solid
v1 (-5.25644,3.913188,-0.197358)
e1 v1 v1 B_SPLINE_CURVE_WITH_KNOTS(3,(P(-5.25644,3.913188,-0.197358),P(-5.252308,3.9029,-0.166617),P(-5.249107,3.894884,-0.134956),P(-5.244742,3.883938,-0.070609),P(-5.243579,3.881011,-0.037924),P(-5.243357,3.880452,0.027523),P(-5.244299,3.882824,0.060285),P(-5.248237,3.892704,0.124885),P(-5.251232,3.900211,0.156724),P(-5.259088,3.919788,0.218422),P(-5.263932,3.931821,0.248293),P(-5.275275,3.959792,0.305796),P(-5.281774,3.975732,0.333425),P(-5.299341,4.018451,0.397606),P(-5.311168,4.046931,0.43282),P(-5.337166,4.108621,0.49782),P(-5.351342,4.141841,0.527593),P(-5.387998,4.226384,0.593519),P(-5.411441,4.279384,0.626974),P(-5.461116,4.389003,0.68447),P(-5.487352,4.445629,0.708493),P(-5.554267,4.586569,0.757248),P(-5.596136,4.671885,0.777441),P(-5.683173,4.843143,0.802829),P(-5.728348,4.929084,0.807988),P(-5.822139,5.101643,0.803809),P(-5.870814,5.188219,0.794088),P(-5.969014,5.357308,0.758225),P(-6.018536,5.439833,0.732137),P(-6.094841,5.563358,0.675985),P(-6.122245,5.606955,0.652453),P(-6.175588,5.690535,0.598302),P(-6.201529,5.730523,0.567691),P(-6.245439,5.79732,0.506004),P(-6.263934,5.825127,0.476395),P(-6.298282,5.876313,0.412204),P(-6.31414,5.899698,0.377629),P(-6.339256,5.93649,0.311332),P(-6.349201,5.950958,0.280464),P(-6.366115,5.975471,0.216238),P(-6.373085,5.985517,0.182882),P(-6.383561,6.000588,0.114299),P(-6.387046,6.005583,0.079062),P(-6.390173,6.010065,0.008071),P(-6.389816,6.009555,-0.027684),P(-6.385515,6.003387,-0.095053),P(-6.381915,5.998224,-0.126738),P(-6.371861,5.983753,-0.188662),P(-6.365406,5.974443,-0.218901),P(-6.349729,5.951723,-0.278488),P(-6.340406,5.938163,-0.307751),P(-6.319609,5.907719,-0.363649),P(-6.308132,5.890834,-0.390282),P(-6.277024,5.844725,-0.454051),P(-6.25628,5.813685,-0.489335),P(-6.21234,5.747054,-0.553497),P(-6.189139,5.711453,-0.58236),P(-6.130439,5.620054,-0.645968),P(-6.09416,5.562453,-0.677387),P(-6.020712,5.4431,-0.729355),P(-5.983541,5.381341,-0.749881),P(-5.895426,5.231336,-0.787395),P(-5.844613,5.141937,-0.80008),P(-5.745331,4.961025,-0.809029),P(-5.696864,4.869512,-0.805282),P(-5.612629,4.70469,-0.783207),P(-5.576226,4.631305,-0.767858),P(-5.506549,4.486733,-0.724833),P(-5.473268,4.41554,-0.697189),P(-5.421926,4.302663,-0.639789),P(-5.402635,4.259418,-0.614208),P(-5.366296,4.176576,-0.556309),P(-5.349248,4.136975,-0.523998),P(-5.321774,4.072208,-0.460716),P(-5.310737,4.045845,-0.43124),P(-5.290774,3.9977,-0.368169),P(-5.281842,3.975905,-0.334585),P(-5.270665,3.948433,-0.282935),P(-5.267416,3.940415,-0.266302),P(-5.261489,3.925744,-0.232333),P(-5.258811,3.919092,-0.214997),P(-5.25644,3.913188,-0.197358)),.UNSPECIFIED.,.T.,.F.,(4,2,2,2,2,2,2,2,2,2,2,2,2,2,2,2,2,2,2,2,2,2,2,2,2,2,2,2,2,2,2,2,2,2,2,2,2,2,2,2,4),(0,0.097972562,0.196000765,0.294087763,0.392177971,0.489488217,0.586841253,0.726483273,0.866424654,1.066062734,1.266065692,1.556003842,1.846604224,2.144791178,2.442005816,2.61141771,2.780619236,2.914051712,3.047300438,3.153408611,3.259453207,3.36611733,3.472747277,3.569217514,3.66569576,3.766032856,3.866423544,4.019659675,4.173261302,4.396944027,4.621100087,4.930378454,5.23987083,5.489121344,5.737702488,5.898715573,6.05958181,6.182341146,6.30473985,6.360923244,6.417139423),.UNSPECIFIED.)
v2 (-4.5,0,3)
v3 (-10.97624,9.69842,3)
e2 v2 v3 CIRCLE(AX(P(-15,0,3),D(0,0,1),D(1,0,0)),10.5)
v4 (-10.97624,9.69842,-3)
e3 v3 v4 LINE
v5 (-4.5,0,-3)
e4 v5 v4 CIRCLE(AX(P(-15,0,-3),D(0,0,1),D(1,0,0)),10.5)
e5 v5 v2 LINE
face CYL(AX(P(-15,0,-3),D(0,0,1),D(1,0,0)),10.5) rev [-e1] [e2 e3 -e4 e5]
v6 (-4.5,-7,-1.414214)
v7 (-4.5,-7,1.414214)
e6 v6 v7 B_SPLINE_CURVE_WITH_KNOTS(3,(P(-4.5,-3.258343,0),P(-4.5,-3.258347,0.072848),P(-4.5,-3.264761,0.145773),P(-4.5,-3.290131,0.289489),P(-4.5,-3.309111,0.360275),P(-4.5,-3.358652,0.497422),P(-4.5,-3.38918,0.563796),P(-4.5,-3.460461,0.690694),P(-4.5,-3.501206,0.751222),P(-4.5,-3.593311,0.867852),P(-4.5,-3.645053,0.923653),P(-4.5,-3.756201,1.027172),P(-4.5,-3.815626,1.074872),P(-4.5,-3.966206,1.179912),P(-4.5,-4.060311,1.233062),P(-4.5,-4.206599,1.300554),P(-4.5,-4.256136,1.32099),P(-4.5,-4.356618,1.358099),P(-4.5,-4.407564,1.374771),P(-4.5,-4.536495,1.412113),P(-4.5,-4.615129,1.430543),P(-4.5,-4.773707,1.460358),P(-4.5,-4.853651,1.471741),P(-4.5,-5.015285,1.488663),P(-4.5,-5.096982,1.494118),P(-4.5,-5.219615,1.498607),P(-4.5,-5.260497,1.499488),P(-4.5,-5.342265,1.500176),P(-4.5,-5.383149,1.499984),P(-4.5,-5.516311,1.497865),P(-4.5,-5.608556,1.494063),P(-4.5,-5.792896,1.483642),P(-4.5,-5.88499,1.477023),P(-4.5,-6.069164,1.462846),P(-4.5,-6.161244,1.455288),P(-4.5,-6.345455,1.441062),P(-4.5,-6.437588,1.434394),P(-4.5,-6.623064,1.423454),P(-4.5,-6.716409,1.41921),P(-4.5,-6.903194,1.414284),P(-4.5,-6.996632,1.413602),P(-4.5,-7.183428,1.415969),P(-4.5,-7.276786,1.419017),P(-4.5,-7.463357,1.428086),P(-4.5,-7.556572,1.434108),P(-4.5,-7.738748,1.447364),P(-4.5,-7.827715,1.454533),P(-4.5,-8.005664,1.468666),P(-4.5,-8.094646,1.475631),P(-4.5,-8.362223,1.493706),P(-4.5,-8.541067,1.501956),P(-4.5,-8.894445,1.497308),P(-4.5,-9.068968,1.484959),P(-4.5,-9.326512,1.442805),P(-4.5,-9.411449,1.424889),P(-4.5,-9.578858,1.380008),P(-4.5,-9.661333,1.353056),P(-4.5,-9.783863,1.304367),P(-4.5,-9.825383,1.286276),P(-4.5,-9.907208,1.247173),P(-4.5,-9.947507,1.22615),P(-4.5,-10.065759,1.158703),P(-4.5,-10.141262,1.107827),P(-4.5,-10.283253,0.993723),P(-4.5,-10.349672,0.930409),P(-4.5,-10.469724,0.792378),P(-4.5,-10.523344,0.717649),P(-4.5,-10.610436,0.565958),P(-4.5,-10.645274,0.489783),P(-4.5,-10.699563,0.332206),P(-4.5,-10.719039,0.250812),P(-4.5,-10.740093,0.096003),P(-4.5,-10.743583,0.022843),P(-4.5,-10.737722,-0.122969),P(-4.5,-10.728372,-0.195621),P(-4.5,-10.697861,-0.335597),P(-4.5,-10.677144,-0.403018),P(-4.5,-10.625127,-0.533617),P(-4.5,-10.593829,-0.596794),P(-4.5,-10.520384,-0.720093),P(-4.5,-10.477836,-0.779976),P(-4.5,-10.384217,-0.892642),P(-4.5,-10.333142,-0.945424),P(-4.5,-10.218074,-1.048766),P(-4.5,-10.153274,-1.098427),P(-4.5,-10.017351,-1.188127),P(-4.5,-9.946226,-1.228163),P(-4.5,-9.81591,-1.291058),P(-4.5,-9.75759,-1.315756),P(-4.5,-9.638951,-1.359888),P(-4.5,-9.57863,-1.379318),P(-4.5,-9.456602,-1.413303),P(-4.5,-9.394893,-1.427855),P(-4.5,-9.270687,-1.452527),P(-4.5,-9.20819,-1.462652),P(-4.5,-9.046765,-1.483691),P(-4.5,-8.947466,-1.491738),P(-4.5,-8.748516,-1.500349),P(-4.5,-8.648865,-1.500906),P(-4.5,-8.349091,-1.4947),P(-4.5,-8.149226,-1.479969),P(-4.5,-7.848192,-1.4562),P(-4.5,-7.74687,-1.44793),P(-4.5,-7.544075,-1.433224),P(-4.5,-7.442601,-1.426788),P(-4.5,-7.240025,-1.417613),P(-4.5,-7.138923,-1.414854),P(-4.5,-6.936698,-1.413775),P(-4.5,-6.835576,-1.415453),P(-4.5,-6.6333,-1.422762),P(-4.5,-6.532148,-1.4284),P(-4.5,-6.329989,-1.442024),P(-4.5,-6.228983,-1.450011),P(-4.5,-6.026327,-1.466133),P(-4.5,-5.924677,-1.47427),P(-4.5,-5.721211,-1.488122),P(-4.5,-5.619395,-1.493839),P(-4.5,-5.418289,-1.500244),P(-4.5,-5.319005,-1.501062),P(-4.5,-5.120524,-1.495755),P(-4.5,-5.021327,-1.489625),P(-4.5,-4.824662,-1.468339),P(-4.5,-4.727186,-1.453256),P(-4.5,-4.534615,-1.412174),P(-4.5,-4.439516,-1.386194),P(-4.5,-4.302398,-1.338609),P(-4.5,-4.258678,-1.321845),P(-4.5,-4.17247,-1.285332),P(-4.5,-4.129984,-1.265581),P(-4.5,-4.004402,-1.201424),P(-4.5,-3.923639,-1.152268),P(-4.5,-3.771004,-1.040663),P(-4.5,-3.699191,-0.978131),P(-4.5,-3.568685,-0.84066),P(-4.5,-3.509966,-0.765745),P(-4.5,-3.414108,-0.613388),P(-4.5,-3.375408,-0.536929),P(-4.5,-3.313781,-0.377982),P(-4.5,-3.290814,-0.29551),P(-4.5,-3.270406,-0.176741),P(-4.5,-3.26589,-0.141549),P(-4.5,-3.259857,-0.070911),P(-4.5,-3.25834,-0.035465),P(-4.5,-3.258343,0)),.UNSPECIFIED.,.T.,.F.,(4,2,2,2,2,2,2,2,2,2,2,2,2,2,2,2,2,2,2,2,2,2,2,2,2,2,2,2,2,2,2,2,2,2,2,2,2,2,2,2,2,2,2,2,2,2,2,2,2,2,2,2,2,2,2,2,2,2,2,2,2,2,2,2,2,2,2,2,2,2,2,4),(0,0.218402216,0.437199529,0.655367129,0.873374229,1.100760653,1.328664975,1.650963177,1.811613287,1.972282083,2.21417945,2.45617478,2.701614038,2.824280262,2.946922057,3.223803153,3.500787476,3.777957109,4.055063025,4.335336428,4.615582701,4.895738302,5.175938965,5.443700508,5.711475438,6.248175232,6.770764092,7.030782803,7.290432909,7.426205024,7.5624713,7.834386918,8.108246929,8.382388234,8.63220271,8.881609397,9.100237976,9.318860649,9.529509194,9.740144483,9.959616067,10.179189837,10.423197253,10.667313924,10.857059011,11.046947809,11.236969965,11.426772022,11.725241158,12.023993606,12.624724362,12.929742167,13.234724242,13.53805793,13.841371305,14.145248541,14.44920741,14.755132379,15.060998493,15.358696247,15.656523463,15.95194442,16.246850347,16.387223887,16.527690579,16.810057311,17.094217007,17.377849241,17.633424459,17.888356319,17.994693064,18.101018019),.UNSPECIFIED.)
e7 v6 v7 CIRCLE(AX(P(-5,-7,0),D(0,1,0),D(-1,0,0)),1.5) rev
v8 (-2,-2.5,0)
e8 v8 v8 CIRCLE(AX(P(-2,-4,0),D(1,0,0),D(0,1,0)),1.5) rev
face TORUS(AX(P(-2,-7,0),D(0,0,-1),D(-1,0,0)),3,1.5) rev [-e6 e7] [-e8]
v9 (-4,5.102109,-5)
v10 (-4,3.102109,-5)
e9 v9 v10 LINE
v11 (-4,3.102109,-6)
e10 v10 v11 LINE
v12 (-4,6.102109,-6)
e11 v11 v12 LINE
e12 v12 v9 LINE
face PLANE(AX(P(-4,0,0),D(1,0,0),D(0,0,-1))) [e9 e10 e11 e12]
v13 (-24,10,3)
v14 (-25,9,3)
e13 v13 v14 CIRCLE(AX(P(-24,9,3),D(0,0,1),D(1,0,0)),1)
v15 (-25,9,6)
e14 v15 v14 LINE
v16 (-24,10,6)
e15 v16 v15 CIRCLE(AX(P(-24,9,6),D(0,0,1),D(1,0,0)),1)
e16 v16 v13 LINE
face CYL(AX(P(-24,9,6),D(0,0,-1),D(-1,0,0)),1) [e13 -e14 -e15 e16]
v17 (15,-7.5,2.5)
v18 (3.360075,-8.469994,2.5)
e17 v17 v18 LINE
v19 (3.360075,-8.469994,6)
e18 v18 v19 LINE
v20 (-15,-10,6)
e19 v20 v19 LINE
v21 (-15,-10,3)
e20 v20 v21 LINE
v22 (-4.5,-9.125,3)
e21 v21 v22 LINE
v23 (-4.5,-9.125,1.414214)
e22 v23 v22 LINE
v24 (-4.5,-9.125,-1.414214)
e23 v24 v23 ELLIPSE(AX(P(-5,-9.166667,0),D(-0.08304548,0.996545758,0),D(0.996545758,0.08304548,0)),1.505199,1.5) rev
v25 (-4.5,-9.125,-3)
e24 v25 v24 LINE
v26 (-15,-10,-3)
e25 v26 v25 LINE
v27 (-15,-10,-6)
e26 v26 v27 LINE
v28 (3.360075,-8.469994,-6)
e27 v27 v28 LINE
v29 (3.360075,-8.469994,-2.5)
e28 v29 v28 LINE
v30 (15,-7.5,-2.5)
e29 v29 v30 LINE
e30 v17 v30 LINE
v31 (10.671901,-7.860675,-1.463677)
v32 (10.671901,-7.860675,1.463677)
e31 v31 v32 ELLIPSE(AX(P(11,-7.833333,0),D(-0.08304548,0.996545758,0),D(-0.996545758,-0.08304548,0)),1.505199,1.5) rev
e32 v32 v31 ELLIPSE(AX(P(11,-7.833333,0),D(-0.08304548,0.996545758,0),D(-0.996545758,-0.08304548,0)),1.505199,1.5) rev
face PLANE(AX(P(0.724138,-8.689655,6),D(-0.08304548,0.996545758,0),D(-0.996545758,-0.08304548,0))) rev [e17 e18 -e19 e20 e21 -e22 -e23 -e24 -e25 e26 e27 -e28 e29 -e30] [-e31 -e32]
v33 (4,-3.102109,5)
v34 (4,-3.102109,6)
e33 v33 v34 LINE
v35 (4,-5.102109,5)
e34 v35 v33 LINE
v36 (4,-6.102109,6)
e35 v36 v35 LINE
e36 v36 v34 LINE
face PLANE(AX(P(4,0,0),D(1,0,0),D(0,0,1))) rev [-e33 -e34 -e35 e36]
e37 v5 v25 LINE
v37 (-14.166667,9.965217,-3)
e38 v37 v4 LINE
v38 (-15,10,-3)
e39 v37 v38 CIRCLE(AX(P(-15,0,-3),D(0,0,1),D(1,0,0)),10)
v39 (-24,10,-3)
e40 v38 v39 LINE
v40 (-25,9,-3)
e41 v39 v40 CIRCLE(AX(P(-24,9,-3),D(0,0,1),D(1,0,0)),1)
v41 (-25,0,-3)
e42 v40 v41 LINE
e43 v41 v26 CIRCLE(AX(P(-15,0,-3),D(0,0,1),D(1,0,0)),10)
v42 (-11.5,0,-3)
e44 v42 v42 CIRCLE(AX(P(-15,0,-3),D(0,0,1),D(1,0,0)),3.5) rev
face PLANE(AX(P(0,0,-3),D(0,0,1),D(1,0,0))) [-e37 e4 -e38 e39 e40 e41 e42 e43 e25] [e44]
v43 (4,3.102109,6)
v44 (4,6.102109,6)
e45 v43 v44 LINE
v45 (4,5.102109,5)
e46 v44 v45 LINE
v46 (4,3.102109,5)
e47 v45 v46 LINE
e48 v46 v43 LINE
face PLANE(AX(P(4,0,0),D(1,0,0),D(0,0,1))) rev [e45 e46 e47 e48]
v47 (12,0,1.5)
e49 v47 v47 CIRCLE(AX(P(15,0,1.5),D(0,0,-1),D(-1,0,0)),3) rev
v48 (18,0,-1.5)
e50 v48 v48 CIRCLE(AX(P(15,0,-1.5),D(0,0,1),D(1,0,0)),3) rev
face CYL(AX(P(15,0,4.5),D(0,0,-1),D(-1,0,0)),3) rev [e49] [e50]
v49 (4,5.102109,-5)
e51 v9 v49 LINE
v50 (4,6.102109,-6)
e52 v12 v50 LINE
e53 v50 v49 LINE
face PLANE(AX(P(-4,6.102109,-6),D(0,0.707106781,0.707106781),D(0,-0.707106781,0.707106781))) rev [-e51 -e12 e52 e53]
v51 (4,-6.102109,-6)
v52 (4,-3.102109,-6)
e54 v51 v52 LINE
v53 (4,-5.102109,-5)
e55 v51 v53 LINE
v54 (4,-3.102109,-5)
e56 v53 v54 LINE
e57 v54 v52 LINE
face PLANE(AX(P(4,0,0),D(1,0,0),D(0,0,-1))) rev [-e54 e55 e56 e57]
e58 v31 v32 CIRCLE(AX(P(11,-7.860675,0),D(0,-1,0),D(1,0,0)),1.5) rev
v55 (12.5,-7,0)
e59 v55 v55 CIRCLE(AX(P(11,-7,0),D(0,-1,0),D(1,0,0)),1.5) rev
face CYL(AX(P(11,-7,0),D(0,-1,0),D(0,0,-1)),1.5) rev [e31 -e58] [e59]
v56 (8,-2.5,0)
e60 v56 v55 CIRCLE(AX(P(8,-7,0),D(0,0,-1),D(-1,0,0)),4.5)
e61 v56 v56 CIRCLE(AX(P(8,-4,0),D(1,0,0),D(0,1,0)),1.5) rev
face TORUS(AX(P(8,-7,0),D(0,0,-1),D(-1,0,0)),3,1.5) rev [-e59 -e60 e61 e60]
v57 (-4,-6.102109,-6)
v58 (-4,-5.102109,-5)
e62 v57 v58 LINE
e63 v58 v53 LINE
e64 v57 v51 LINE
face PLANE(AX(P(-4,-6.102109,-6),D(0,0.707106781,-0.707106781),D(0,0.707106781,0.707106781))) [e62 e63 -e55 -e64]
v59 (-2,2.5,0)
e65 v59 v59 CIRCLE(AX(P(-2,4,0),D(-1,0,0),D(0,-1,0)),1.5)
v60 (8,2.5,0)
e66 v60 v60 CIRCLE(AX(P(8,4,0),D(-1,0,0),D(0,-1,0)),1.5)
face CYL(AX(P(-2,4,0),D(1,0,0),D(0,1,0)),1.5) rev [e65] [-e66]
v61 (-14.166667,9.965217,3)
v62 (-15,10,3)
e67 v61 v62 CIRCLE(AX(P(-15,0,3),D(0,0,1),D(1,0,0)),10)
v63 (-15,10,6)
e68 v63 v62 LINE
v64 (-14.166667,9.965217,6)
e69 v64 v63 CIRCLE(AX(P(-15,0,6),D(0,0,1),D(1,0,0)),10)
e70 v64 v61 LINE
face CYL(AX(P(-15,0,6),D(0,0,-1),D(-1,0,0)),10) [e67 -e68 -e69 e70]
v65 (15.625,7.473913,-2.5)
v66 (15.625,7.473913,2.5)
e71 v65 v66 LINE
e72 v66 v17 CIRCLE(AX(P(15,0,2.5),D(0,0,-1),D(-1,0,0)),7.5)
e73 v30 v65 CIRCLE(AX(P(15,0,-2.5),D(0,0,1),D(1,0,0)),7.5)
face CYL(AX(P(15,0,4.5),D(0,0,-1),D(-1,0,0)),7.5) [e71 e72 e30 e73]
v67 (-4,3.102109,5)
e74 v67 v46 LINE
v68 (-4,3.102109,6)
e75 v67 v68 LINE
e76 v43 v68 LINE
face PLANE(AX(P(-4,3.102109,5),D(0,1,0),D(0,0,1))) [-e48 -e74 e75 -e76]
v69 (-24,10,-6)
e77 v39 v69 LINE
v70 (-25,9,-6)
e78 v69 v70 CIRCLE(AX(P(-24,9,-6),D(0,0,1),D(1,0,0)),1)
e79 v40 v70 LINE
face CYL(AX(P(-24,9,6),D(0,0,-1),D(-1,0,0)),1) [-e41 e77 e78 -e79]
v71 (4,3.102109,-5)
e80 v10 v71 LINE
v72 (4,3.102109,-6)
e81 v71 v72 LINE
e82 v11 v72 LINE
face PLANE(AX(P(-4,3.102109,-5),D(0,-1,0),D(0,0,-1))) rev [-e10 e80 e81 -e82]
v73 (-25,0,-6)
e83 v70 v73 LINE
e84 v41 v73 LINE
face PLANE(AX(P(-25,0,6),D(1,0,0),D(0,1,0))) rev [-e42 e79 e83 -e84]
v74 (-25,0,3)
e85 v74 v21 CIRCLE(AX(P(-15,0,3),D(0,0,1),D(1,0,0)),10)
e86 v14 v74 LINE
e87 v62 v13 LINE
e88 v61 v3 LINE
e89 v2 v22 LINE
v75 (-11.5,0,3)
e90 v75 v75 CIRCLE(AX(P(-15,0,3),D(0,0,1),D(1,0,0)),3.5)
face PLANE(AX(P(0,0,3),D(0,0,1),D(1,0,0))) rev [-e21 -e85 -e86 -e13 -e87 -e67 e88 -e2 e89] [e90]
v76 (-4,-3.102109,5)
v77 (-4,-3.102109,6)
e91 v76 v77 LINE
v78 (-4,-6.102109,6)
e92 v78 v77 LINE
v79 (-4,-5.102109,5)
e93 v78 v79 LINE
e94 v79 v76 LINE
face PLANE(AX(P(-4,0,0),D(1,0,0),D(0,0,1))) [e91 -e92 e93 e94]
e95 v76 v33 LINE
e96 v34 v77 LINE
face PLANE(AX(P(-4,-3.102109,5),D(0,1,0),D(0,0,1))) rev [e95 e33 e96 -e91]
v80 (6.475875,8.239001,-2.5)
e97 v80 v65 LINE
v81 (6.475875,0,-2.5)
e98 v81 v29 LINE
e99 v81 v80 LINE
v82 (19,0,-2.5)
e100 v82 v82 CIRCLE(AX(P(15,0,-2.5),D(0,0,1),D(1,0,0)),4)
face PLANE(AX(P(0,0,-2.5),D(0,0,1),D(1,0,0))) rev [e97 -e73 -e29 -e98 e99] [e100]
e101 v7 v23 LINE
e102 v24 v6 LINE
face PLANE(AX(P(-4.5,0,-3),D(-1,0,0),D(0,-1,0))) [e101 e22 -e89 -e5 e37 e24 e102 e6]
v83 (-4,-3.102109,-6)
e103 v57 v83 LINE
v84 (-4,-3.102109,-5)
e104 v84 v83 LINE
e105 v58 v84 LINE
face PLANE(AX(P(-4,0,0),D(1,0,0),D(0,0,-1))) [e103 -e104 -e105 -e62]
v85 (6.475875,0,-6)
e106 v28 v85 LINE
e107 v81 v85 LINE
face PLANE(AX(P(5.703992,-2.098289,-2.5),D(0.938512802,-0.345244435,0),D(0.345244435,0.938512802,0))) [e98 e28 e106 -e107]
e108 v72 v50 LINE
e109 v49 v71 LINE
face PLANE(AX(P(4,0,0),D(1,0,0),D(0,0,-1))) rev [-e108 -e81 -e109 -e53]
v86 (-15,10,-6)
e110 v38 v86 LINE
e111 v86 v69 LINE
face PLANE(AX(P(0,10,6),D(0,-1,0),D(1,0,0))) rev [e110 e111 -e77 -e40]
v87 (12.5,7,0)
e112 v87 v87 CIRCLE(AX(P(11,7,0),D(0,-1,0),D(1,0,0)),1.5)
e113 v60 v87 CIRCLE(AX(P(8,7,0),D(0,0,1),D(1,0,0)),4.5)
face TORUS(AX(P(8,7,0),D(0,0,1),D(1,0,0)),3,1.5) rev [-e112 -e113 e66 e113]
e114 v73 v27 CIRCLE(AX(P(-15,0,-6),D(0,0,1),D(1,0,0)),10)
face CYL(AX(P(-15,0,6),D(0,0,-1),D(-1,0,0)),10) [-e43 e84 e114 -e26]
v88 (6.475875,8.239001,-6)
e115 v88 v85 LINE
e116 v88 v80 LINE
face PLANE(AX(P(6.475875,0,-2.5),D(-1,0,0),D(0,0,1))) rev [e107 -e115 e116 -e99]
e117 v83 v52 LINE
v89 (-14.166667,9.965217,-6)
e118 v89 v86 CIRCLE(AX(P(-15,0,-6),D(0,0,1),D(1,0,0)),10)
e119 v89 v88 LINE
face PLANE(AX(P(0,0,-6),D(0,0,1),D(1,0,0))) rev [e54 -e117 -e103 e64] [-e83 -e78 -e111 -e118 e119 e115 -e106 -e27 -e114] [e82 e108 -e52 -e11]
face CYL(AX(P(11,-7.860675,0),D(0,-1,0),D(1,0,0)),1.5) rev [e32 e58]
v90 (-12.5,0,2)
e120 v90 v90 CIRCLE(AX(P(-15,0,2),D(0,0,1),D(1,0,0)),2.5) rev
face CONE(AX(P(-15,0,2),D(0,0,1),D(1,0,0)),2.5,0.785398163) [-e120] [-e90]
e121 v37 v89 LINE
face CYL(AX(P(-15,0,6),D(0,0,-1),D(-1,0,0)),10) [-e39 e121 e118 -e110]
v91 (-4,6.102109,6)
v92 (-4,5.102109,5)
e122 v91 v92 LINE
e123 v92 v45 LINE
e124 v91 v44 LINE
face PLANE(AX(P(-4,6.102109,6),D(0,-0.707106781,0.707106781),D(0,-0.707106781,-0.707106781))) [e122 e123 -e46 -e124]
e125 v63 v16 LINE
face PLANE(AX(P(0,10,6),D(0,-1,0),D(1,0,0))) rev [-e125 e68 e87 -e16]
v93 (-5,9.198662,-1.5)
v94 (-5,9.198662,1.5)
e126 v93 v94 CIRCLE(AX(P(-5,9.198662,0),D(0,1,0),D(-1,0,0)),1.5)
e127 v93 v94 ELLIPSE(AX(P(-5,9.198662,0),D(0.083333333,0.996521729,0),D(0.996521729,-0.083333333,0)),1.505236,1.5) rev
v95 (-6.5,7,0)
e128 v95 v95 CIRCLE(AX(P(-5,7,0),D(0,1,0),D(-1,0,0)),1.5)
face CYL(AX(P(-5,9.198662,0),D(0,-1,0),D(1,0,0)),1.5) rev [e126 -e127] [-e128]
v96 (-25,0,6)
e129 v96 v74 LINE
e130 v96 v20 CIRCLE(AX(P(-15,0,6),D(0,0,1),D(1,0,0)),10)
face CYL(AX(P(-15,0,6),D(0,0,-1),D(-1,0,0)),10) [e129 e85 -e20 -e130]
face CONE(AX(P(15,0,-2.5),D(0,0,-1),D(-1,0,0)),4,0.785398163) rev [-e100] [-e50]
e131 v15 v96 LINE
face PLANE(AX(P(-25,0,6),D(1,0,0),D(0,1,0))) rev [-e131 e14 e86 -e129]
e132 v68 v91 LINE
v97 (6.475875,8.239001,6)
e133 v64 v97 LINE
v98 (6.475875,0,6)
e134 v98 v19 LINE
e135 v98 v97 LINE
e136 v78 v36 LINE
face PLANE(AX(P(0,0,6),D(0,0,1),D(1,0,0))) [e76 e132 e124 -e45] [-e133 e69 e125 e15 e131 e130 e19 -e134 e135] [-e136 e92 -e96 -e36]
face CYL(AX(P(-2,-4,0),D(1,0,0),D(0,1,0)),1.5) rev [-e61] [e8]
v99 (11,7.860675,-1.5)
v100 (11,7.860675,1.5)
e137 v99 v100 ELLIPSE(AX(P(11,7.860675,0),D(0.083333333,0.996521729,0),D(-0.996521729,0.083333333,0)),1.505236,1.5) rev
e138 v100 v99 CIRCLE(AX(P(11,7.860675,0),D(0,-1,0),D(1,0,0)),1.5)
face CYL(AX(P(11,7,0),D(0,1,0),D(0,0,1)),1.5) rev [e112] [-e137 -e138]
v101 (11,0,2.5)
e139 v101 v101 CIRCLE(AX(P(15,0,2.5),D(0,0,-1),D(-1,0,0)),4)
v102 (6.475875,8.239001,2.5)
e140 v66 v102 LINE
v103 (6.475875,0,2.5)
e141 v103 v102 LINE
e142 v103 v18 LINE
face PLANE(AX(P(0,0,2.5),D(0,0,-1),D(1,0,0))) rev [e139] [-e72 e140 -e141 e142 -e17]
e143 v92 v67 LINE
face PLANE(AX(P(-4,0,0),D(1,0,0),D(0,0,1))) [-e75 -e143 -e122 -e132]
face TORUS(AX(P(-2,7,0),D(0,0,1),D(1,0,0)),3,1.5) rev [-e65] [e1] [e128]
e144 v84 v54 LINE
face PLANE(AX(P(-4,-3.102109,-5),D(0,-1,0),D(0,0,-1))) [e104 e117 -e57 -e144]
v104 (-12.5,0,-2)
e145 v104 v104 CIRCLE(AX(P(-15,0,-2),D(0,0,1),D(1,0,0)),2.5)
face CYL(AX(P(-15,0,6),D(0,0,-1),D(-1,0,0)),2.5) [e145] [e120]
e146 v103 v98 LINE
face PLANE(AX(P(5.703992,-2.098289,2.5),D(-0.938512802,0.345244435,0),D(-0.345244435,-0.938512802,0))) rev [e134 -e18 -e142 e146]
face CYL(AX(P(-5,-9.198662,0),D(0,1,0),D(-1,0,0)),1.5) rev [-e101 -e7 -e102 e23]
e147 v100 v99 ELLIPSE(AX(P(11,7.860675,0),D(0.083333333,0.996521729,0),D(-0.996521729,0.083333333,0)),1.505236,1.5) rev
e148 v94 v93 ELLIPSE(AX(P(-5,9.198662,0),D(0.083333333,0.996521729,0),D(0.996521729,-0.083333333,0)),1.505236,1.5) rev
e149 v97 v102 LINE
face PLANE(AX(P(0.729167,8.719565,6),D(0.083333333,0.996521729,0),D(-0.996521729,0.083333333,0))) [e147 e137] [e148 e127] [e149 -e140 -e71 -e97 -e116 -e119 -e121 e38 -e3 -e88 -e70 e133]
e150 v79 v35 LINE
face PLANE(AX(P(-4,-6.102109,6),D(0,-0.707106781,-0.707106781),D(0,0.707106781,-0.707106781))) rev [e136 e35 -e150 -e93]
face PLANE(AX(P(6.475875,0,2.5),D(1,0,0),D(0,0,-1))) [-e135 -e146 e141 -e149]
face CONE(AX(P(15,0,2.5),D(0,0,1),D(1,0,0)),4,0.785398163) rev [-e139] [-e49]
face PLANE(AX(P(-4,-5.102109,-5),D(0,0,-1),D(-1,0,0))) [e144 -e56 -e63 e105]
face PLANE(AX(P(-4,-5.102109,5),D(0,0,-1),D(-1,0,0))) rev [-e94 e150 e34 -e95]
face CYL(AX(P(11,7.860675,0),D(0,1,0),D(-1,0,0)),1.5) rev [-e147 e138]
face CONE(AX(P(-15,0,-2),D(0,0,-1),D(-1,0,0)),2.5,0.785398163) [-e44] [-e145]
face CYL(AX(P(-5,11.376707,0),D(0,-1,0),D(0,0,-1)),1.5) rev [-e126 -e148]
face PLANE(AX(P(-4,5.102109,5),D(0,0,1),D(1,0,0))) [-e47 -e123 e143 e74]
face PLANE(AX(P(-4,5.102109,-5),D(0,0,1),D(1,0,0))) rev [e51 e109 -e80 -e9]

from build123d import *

# Parameters (mm, degrees)
BOSS_EXTRUDE1_DEPTH  = 6
SKETCH1_3_R          = 2.5
BOSS_EXTRUDE2_DEPTH  = 6
SKETCH1_5_R          = 3
BOSS_EXTRUDE3_DEPTH  = 4.5
SKETCH1_6_R          = 2.5
CUT_EXTRUDE2_DEPTH   = 3
CUT_EXTRUDE3_DEPTH   = 3
CUT_EXTRUDE4_START   = -10
CUT_EXTRUDE4_DEPTH   = 7.5
CUT_SWEEP5_PROFILE_R = 1.5
SKETCH1_7_R          = 2.5
BOSS_EXTRUDE4_DEPTH  = 6
CHAMFER1_SIZE        = 1
CUT_EXTRUDE5_DEPTH   = 4
MIRROR4_COPY_1_DEPTH = 4
MIRROR4_COPY_2_DEPTH = 4


with BuildPart() as part:
    # Sketch1 → Boss-Extrude1 (new, symmetric)
    with BuildSketch(Plane.XY):
        with BuildLine():
            Line((15.625, 7.473912964), (-14.166666667, 9.965217286))
            ThreePointArc((-14.166666667, 9.965217286), (-5.008579418, 0.414143408), (-13.344827586, -9.862068966))
            Line((-13.344827586, -9.862068966), (15, -7.5))
            ThreePointArc((15, -7.5), (7.506524597, 0.312772095), (15.625, 7.473912964))
        make_face()
    extrude(amount=BOSS_EXTRUDE1_DEPTH, both=True)

    # Sketch1<3> → Boss-Extrude2 (add, symmetric)
    with BuildSketch(Plane.XY):
        with BuildLine():
            ThreePointArc((-13.344827586, -9.862068966), (-5.008579418, 0.414143408), (-14.166666667, 9.965217286))
            ThreePointArc((-14.166666667, 9.965217286), (-14.58297054, 9.991300537), (-15, 10))
            Line((-15, 10), (-24, 10))
            ThreePointArc((-24, 10), (-24.707106781, 9.707106781), (-25, 9))
            Line((-25, 9), (-25, 0))
            ThreePointArc((-25, 0), (-22.071067812, -7.071067812), (-15, -10))
            Line((-15, -10), (-13.344827586, -9.862068966))
        make_face()
        with Locations((-15, 0)):
            Circle(SKETCH1_3_R, mode=Mode.SUBTRACT)
    extrude(amount=BOSS_EXTRUDE2_DEPTH, both=True)

    # Sketch1<5> → Boss-Extrude3 (add, symmetric)
    with BuildSketch(Plane.XY):
        with BuildLine():
            ThreePointArc((22.5, 0), (20.519850541, 5.077524003), (15.625, 7.473912964))
            ThreePointArc((15.625, 7.473912964), (7.506524597, 0.312772095), (15, -7.5))
            ThreePointArc((15, -7.5), (20.303300859, -5.303300859), (22.5, 0))
        make_face()
        with Locations((15, 0)):
            Circle(SKETCH1_5_R, mode=Mode.SUBTRACT)
    extrude(amount=BOSS_EXTRUDE3_DEPTH, both=True)

    # Sketch1<6> → Cut-Extrude2 (cut, symmetric)
    with BuildSketch(Plane.XY):
        with BuildLine():
            ThreePointArc((-13.344827586, -9.862068966), (-5.008579418, 0.414143408), (-14.166666667, 9.965217286))
            ThreePointArc((-14.166666667, 9.965217286), (-14.58297054, 9.991300537), (-15, 10))
            Line((-15, 10), (-24, 10))
            ThreePointArc((-24, 10), (-24.707106781, 9.707106781), (-25, 9))
            Line((-25, 9), (-25, 0))
            ThreePointArc((-25, 0), (-22.071067812, -7.071067812), (-15, -10))
            Line((-15, -10), (-13.344827586, -9.862068966))
        make_face()
        with Locations((-15, 0)):
            Circle(SKETCH1_6_R, mode=Mode.SUBTRACT)
    extrude(amount=CUT_EXTRUDE2_DEPTH, both=True, mode=Mode.SUBTRACT)

    # Sketch2 → Cut-Extrude3 (cut, symmetric)
    with BuildSketch(Plane.XY):
        with BuildLine():
            Line((-4.5, -10.5), (-4.5, 0))
            ThreePointArc((-4.5, 0), (-22.424621202, 7.424621202), (-15, -10.5))
            Line((-15, -10.5), (-4.5, -10.5))
        make_face()
    extrude(amount=CUT_EXTRUDE3_DEPTH, both=True, mode=Mode.SUBTRACT)

    # Sketch2<3> → Cut-Extrude4 (cut)
    with BuildSketch(Plane.XY.offset(CUT_EXTRUDE4_START)):
        with BuildLine():
            Line((6.475875471, 8.877657642), (6.475875471, 0))
            Line((6.475875471, 0), (3, -9.448823218))
            Line((3, -9.448823218), (15, -9.448823218))
            Line((15, -9.448823218), (15, -8))
            ThreePointArc((15, -8), (23, 0), (15, 8))
            Line((15, 8), (6.475875471, 8.877657642))
        make_face()
    cut_extrude4 = extrude(amount=CUT_EXTRUDE4_DEPTH, mode=Mode.SUBTRACT)

    # Mirror1: Cut-Extrude4 across plane
    add(cut_extrude4.mirror(Plane.XY), mode=Mode.SUBTRACT)

    # Cut-Sweep5: sweep along a path in Sketch3
    with BuildLine(Plane.XY) as cut_sweep5_path:
        Line((-5, 11.376707414), (-5, 9.19866211))
        Line((-5, 9.19866211), (-5, 7))
        ThreePointArc((-5, 7), (-4.121320344, 4.878679656), (-2, 4))
        Line((-2, 4), (8, 4))
        ThreePointArc((8, 4), (10.121320344, 4.878679656), (11, 7))
        Line((11, 7), (11, 7.860674894))
        Line((11, 7.860674894), (11, 10.978155515))
    # Cut-Sweep5 profile (on start of the path) → Cut-Sweep5 (sweep, cut)
    with BuildSketch(Plane(origin=(-5, 11.376707414, 0), x_dir=(0, 0, -1), z_dir=(0, -1, 0))):
        Circle(CUT_SWEEP5_PROFILE_R)
    cut_sweep5 = sweep(path=cut_sweep5_path.line, mode=Mode.SUBTRACT)

    # Mirror2: Cut-Sweep5 across plane
    add(cut_sweep5.mirror(Plane.ZX), mode=Mode.SUBTRACT)

    # Sketch1<7> → Boss-Extrude4 (add, symmetric)
    with BuildSketch(Plane.XY):
        with Locations((-15, 0)):
            Circle(SKETCH1_7_R)
    extrude(amount=BOSS_EXTRUDE4_DEPTH, both=True)

    # Chamfer1
    chamfer1_edges = [part.edges().sort_by_distance(p)[0] for p in [
        (12, 0, -2.5),
        (12, 0, 2.5),
        (-17.5, 0, 3),
        (-17.5, 0, -3),
    ]]
    chamfer(chamfer1_edges, length=CHAMFER1_SIZE)

    # Sketch139 → Cut-Extrude5 (cut, symmetric)
    with BuildSketch(Plane(origin=(0, 0, 0), x_dir=(0, 0, -1), z_dir=(1, 0, 0))):
        Polygon((6, 9.102109239), (6, 6.102109239), (5, 5.102109239), (5, 3.102109239), (7.604988318, 3.102109239), (7.604988318, 9.102109239), align=None)
    cut_extrude5 = extrude(amount=CUT_EXTRUDE5_DEPTH, both=True, mode=Mode.SUBTRACT)

    # Mirror3: Cut-Extrude5 across plane
    add(cut_extrude5.mirror(Plane.ZX), mode=Mode.SUBTRACT)

    # Mirror4 copy 1 sketch → Mirror4 copy 1 (cut, symmetric)
    with BuildSketch(Plane(origin=(0, 0, 0), x_dir=(0, 0, 1), z_dir=(1, 0, 0))):
        Polygon((6, 9.102109239), (6, 6.102109239), (5, 5.102109239), (5, 3.102109239), (7.604988318, 3.102109239), (7.604988318, 9.102109239), align=None)
    extrude(amount=MIRROR4_COPY_1_DEPTH, both=True, mode=Mode.SUBTRACT)

    # Mirror4 copy 2 sketch → Mirror4 copy 2 (cut, symmetric)
    with BuildSketch(Plane(origin=(0, 0, 0), x_dir=(0, 0, 1), z_dir=(1, 0, 0))):
        Polygon((6, -9.102109239), (6, -6.102109239), (5, -5.102109239), (5, -3.102109239), (7.604988318, -3.102109239), (7.604988318, -9.102109239), align=None)
    extrude(amount=MIRROR4_COPY_2_DEPTH, both=True, mode=Mode.SUBTRACT)


solid = part.part
